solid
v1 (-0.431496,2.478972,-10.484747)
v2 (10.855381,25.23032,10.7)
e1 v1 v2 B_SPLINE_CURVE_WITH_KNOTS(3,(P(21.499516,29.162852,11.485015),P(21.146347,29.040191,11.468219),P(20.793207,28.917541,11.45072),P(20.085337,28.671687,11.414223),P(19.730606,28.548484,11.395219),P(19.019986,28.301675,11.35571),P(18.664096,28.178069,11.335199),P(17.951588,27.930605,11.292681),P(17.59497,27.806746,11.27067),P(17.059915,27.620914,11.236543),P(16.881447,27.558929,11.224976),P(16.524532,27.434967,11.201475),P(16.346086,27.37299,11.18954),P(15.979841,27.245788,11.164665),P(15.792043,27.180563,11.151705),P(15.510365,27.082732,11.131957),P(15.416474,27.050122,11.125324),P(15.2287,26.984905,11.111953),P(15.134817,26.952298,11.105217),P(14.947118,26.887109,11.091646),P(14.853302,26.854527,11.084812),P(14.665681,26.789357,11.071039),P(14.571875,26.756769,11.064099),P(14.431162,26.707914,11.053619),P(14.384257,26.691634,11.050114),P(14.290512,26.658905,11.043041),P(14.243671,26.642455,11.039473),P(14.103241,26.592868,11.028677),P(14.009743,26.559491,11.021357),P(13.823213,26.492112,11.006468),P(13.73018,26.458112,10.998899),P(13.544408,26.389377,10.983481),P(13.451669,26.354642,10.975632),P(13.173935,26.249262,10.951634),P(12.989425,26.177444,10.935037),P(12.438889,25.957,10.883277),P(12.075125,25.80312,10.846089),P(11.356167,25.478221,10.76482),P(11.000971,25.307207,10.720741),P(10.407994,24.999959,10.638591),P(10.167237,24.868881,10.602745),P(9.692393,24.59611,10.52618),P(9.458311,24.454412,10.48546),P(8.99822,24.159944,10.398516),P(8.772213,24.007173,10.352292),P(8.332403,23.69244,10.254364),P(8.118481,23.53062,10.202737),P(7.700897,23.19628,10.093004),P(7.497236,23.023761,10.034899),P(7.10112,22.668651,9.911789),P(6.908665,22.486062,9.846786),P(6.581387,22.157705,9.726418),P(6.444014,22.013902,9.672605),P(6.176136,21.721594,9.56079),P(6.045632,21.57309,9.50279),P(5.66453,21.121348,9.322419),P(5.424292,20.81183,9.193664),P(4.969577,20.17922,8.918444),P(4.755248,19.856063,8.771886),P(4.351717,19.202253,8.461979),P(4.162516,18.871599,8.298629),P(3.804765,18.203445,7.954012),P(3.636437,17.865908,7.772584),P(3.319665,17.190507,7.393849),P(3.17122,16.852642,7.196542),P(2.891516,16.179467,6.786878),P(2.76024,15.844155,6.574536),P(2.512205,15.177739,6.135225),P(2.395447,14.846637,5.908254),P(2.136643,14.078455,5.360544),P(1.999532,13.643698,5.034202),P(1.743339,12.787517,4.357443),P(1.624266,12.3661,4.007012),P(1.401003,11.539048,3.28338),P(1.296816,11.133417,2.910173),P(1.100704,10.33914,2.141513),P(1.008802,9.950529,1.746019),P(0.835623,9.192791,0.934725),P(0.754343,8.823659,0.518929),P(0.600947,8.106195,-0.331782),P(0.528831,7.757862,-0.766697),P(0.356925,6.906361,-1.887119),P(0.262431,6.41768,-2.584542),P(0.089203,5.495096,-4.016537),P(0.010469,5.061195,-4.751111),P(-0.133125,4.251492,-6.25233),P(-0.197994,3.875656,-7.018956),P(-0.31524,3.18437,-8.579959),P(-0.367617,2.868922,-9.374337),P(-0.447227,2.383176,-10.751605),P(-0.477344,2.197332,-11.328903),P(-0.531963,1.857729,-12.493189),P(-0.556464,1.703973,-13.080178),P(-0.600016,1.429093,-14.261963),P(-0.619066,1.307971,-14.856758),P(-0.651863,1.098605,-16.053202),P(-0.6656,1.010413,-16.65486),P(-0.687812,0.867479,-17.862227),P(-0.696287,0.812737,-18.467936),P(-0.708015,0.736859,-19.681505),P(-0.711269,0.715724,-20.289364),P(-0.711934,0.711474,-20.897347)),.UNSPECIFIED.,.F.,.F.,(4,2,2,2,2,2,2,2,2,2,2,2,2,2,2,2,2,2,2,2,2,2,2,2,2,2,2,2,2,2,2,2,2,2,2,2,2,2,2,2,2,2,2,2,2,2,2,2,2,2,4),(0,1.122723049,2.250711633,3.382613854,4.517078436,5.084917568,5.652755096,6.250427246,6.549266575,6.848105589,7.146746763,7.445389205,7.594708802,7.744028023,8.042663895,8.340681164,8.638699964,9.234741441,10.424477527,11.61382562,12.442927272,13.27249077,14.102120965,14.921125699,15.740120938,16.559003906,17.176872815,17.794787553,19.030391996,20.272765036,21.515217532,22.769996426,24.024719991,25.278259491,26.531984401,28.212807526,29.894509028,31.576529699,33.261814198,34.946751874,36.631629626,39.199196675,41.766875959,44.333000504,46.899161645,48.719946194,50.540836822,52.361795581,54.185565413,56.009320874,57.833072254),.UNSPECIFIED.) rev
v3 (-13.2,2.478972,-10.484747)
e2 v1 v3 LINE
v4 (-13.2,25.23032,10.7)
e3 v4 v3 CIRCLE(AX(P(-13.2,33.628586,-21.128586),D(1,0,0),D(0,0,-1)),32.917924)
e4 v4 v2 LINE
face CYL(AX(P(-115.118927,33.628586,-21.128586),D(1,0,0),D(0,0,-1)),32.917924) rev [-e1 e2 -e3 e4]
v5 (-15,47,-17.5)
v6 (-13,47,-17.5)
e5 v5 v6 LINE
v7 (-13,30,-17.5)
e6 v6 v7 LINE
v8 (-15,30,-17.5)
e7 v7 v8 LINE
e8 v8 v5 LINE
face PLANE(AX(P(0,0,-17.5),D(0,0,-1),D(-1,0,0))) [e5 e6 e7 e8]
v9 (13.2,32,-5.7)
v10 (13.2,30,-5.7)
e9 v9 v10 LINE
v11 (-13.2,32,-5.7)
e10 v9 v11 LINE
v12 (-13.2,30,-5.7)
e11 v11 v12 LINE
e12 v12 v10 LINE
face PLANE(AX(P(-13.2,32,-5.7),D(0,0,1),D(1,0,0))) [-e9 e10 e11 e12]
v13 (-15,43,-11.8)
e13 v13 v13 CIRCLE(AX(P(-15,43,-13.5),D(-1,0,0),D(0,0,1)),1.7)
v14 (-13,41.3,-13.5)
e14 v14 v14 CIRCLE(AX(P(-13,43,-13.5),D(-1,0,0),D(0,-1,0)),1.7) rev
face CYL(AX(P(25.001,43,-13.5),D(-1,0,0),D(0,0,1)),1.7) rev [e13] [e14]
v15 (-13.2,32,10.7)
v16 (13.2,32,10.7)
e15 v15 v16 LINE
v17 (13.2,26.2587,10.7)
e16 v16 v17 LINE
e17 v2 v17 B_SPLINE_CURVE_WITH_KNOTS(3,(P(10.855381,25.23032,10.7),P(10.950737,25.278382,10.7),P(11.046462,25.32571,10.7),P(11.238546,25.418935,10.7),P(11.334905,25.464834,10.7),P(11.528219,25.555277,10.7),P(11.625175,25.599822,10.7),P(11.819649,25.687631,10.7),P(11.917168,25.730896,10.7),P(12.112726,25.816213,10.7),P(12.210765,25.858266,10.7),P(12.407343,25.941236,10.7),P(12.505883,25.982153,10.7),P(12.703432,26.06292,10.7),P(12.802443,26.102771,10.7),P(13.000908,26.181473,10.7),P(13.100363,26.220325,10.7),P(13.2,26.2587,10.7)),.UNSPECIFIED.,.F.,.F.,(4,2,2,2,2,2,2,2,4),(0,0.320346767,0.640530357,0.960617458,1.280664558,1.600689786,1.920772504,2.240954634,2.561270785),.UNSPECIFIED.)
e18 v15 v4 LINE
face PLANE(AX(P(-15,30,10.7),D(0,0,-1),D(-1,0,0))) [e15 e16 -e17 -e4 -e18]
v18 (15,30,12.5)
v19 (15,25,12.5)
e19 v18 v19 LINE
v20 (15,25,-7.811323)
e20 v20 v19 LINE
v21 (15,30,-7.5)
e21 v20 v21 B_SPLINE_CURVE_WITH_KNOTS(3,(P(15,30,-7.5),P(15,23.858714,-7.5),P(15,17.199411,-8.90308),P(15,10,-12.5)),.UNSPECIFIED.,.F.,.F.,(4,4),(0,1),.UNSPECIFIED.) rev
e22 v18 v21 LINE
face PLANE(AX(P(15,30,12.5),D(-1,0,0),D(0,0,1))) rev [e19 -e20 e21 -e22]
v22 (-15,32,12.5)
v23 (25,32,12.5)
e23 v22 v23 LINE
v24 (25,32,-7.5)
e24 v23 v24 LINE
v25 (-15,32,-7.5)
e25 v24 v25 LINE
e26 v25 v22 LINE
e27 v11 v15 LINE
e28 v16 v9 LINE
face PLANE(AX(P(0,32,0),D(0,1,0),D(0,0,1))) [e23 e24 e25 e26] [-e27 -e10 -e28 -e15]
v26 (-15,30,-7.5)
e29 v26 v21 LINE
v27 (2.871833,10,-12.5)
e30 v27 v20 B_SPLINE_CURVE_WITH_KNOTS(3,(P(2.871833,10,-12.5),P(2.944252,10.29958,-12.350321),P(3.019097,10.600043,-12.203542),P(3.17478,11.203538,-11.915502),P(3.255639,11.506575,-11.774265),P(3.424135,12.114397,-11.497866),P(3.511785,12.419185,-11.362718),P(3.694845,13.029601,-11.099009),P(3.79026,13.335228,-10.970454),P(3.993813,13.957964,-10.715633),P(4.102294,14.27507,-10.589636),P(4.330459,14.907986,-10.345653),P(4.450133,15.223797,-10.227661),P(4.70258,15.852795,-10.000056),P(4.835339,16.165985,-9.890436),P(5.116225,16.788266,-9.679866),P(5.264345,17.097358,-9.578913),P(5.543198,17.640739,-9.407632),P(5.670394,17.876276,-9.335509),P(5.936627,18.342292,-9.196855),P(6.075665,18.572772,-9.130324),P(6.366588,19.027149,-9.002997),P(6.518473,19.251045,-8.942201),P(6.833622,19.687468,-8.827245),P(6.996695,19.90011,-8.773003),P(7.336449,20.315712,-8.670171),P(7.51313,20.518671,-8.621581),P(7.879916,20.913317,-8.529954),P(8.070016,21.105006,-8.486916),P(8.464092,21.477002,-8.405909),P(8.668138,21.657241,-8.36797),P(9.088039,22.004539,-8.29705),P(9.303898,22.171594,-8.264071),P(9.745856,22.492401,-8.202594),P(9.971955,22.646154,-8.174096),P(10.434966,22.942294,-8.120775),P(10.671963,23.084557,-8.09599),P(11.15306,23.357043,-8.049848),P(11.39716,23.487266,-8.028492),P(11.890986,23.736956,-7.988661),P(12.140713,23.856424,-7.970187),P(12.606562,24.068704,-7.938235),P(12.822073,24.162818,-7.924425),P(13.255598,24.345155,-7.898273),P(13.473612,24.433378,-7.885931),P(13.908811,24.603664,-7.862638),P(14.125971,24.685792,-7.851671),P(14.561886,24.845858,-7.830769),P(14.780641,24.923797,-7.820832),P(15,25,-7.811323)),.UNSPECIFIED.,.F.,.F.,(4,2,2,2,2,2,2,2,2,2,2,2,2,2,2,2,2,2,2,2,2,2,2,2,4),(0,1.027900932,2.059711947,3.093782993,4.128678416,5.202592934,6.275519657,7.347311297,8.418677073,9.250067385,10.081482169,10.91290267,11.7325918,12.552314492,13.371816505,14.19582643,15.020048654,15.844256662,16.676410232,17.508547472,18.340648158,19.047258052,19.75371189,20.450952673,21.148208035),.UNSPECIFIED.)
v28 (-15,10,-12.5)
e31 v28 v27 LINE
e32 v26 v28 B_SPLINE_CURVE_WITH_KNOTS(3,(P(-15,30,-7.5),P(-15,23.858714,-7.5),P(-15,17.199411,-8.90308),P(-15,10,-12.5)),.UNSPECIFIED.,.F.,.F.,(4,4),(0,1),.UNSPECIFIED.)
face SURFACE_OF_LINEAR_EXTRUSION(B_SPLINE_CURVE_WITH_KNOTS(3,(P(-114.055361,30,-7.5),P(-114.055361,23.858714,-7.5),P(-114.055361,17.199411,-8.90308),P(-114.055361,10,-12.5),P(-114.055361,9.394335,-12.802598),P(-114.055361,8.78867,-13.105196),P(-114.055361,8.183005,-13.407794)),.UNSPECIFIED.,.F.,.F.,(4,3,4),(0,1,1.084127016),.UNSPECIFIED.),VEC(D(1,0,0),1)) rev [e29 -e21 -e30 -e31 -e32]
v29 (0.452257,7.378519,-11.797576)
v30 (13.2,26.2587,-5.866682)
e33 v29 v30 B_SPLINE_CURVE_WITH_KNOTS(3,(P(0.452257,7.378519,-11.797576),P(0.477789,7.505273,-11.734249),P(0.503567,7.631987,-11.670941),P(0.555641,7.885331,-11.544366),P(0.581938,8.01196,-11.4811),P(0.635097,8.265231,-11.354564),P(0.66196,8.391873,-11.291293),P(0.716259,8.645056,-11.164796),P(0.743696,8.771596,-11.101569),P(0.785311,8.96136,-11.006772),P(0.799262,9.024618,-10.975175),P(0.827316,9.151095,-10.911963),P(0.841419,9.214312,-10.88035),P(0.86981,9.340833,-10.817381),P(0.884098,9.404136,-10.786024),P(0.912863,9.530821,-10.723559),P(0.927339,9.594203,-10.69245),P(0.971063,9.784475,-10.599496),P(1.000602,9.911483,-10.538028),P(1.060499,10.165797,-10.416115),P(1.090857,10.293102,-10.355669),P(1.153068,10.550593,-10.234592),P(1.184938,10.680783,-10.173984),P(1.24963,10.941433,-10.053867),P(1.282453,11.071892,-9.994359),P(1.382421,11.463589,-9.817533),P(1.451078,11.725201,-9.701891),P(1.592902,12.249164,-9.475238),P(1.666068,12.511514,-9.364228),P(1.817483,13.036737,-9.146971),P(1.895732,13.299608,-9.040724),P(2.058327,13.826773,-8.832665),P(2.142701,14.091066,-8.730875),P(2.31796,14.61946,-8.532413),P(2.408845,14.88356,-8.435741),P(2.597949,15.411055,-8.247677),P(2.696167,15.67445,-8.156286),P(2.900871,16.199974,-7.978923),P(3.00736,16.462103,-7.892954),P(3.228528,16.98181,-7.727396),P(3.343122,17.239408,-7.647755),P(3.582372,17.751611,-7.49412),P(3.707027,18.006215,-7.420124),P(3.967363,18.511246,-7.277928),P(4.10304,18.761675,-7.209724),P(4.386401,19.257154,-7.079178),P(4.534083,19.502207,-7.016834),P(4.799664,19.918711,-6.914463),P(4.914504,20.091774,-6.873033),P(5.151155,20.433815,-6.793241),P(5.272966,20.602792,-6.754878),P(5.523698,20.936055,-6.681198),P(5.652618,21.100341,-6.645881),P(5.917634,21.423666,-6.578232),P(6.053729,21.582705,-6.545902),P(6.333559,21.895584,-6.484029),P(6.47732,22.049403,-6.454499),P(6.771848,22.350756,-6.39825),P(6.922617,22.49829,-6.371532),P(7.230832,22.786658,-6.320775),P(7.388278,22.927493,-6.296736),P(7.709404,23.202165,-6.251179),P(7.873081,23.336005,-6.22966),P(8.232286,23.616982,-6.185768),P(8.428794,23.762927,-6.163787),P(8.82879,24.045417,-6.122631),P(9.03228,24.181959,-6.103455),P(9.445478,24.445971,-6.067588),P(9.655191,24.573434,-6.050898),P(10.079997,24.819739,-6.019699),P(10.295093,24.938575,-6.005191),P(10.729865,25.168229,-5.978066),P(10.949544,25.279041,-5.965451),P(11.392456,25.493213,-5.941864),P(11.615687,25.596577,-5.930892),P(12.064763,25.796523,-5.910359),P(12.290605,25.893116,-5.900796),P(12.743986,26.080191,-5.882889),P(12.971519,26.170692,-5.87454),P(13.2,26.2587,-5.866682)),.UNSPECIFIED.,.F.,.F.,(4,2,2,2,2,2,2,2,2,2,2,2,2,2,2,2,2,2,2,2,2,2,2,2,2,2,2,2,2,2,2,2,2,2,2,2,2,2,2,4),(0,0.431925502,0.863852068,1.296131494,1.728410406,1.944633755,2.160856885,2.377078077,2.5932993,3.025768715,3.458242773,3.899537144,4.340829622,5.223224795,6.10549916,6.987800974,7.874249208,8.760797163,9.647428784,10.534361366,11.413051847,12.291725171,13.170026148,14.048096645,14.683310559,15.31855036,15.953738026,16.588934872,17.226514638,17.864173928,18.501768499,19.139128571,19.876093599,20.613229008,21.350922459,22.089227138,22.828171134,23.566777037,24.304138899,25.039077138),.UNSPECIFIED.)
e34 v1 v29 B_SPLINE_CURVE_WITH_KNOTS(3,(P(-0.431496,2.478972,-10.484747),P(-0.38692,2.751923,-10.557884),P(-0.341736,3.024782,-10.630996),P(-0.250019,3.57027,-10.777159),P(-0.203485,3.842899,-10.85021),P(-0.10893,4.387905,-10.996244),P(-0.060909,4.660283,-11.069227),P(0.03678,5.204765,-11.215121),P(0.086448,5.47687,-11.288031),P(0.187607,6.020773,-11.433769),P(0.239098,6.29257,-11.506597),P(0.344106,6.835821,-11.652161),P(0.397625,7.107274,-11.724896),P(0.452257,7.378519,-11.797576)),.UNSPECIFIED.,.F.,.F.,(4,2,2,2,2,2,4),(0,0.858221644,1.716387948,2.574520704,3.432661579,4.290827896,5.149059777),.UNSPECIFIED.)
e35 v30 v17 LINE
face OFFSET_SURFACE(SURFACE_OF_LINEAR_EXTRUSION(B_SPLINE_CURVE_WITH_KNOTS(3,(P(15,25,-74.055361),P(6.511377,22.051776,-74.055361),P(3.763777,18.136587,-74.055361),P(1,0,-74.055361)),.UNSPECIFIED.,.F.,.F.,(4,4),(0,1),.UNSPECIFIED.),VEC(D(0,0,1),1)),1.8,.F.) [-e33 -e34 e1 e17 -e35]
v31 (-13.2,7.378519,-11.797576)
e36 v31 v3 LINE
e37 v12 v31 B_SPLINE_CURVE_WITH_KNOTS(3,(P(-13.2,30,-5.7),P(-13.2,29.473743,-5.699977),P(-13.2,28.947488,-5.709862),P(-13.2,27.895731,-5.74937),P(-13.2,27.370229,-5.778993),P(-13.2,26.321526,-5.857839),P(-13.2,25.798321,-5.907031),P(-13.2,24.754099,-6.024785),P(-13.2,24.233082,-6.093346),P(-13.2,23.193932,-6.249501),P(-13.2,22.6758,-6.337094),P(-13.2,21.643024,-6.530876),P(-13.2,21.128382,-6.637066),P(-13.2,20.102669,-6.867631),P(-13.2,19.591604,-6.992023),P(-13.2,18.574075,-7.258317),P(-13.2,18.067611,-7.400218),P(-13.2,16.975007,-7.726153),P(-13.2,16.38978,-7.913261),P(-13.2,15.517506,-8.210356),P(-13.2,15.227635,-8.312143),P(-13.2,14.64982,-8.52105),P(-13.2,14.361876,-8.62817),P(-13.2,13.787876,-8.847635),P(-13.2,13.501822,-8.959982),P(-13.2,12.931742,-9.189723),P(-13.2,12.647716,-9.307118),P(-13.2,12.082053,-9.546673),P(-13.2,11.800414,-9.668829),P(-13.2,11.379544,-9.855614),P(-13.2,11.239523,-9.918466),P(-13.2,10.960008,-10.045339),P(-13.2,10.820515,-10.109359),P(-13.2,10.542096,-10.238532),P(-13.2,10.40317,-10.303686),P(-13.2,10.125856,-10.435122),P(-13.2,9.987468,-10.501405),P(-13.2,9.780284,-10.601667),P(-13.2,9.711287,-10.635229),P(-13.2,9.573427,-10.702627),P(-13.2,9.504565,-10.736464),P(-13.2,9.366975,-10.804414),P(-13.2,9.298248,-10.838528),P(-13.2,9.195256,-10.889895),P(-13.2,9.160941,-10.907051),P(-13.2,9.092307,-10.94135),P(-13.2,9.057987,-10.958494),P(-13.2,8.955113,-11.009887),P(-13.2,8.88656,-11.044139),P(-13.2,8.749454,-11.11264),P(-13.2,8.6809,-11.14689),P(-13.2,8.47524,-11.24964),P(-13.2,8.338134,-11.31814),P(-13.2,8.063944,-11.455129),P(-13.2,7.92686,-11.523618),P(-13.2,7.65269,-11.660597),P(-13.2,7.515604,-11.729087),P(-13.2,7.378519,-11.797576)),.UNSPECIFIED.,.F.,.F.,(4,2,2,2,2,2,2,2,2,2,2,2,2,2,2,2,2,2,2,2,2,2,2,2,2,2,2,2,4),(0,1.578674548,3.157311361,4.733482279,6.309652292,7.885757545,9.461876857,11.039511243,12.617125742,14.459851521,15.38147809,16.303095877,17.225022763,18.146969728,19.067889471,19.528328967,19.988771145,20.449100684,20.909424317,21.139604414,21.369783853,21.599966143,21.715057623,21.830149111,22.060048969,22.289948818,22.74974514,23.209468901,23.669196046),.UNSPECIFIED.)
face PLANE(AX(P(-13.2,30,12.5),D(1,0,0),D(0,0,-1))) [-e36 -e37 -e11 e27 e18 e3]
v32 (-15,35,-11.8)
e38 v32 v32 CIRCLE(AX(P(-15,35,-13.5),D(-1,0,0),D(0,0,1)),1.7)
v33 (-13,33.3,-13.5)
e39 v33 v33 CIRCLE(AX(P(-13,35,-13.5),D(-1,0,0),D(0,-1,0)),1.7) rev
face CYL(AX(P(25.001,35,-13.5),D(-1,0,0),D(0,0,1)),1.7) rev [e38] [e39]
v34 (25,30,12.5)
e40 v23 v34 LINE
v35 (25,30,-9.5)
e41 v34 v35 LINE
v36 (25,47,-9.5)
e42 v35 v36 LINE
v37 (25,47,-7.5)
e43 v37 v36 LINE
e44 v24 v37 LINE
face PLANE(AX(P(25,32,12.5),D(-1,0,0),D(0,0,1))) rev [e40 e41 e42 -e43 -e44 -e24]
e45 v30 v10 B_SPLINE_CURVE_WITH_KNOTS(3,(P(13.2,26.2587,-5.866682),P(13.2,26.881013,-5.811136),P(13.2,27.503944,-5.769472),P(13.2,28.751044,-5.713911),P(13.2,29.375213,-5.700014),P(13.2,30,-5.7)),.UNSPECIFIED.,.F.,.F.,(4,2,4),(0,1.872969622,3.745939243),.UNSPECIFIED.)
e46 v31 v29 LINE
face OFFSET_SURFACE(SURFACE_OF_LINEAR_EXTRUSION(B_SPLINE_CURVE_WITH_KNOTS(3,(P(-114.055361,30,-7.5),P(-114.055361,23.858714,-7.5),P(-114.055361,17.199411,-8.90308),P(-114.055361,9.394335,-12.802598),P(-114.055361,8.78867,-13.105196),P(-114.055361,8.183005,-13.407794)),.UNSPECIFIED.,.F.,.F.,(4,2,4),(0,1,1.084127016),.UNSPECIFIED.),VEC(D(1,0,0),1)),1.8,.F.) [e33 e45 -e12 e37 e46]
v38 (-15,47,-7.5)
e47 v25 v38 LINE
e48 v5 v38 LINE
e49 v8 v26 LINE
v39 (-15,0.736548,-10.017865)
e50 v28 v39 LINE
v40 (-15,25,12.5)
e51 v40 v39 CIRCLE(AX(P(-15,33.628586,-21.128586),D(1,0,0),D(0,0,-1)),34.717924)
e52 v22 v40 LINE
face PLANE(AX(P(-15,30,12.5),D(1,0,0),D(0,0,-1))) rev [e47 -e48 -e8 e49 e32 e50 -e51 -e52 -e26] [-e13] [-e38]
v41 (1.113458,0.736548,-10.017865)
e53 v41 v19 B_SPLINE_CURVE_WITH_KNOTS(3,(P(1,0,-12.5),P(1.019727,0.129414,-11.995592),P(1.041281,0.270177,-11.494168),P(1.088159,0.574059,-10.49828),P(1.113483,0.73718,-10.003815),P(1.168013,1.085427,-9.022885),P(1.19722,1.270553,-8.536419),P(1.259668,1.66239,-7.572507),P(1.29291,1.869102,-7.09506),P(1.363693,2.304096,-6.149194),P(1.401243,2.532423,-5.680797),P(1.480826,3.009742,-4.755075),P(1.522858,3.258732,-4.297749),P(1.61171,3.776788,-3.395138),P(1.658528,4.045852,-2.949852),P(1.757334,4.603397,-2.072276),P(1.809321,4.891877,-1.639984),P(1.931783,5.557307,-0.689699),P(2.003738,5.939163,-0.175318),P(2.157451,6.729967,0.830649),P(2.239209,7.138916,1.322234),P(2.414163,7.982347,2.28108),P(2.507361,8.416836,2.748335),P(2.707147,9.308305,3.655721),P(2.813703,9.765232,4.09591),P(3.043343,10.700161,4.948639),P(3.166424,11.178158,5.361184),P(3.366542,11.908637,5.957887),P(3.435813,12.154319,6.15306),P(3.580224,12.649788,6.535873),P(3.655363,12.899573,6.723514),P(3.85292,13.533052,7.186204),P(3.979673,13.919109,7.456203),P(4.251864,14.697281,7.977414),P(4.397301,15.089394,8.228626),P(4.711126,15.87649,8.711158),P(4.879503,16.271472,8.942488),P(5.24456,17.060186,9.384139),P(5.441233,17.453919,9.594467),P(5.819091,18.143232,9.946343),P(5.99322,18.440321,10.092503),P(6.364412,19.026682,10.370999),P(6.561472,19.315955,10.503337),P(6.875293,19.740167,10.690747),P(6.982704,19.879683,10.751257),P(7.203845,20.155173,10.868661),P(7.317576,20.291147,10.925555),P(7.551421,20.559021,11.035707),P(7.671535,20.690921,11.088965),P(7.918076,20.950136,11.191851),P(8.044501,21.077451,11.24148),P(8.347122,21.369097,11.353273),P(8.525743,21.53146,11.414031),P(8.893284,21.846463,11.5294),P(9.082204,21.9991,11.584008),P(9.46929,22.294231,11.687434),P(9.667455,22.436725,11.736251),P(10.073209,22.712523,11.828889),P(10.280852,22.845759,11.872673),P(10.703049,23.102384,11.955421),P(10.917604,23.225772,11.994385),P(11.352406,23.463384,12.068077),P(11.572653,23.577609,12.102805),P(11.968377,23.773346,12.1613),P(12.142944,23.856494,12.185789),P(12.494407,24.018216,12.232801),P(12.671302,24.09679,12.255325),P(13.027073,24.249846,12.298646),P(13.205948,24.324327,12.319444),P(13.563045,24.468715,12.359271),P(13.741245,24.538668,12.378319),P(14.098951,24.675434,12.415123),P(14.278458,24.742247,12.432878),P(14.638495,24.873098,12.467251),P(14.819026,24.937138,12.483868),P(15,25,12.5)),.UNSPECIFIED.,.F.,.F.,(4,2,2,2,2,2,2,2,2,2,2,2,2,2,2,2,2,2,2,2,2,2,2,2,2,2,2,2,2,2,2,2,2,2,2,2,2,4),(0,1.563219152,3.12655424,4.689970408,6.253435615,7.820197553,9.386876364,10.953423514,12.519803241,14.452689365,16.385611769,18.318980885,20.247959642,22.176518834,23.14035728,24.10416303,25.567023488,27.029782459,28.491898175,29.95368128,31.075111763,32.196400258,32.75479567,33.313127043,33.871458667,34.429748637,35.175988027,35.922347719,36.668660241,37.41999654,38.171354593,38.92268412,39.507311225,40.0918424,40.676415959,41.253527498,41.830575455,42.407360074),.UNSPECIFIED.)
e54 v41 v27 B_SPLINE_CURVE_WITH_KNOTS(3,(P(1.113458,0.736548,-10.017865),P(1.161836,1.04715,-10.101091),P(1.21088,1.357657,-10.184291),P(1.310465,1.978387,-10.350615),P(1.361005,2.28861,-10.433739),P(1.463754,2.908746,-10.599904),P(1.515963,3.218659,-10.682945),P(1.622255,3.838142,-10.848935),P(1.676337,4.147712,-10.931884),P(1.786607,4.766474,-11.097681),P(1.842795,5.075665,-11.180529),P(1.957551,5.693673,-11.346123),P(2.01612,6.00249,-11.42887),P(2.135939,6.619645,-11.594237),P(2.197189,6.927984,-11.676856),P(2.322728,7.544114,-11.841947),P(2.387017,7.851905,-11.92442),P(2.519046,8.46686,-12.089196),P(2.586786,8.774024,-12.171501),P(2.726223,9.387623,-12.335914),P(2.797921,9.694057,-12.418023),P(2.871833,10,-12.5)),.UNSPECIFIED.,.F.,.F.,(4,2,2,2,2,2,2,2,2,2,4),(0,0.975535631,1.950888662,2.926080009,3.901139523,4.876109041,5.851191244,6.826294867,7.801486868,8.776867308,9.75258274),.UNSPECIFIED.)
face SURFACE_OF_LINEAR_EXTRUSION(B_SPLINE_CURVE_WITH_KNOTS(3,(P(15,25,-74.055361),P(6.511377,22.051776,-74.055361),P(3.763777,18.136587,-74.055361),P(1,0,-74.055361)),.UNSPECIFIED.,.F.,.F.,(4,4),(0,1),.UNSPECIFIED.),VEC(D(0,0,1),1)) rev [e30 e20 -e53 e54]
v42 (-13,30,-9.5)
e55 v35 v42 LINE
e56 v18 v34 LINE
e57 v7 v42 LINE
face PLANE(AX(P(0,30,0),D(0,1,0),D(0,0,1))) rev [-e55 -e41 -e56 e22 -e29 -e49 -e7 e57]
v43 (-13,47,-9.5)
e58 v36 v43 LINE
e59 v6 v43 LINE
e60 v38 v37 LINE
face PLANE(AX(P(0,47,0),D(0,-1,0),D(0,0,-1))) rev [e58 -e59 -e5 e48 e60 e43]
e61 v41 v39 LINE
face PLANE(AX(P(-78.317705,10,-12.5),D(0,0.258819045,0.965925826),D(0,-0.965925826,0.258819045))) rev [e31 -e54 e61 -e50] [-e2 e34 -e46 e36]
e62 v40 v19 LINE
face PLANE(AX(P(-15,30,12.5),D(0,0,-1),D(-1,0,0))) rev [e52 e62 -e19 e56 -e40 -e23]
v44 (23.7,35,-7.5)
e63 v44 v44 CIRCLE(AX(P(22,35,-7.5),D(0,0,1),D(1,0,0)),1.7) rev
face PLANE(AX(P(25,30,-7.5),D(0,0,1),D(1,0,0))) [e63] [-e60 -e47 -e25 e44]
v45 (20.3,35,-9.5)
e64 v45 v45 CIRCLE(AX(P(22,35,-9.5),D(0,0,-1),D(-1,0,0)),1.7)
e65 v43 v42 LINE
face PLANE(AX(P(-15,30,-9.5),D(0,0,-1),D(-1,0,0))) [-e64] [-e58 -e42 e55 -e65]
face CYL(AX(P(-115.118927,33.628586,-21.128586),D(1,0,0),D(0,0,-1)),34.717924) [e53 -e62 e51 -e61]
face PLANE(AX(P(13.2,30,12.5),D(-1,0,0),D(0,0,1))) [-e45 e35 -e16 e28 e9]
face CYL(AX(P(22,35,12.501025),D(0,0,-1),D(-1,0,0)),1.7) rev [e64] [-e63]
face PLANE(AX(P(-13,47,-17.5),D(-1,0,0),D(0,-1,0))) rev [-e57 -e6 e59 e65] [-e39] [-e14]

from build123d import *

# Parameters (mm, degrees)
SKETCH_1_W               = 30
SKETCH_1_H               = 25
EXTRUDE_1_DEPTH          = 30
CUT_EXTRUDE_START        = -25
CUT_EXTRUDE_1_DEPTH      = 25
CUT_EXTRUDE_START_2      = -30
CUT_EXTRUDE_2_DEPTH      = 30
CUT_EXTRUDE_3_DEPTH      = 45.229515196
CUT_EXTRUDE_3_DEPTH_BACK = 45.229515196
CUT_EXTRUDE_4_DEPTH      = 45.229515196
CUT_EXTRUDE_4_DEPTH_BACK = 45.229515196
SHELL_2_T                = -1.8
SKETCH_8_W               = 40
SKETCH_8_H               = 20
SKETCH_8_W_2             = 26.4
SKETCH_8_H_2             = 16.4
EXTRUDE_2_DEPTH          = 2
EXTRUDE_3_DEPTH          = 15
EXTRUDE_3_DEPTH_BACK     = 2
SKETCH_9_W               = 40
SKETCH_9_H               = 2
SKETCH_10_W              = 2
SKETCH_10_H              = 17
EXTRUDE_4_DEPTH          = 8
CUT_EXTRUDE_5_REACH      = 66.15
SKETCH_13_R              = 1.7
CUT_EXTRUDE_6_REACH      = 59.602
SKETCH_14_R              = 1.7


# Read off the part's stored shape, not the designer's step: 切除-拉伸1, 切除-拉伸2
with BuildPart() as part:
    # 草图1 → 凸台-拉伸1 (new body)
    with BuildSketch(Plane(origin=(0, 0, 0), x_dir=(1, 0, 0), z_dir=(0, 1, 0))):
        Rectangle(SKETCH_1_W, SKETCH_1_H)
    extrude(amount=EXTRUDE_1_DEPTH)

    # 切除-拉伸1 outline → 切除-拉伸1 (cut)
    with BuildSketch(Plane(origin=(0, 0, -12.5), x_dir=(-1, 0, 0), z_dir=(0, 0, -1)).offset(CUT_EXTRUDE_START)):
        with BuildLine():
            add(Edge.make_bspline(
                [(-15, 25), (-6.511377405, 22.051776189), (-3.763777339, 18.136586702), (-1, 0)],
                knots=[0, 0, 0, 0, 1, 1, 1, 1], degree=3))
            Line((-15, 25), (-15, 0))
            Line((-15, 0), (-1, 0))
        make_face()
    extrude(amount=CUT_EXTRUDE_1_DEPTH, mode=Mode.SUBTRACT)

    # 切除-拉伸2 outline → 切除-拉伸2 (cut)
    with BuildSketch(Plane.ZY.offset(15).offset(CUT_EXTRUDE_START_2)):
        with BuildLine():
            add(Edge.make_bspline(
                [(-7.5, 30), (-7.5, 23.858714032), (-8.903080152, 17.199411136), (-12.5, 10)],
                knots=[0, 0, 0, 0, 1, 1, 1, 1], degree=3))
            Line((-7.5, 30), (-12.5, 30))
            Line((-12.5, 30), (-12.5, 10))
        make_face()
    extrude(amount=CUT_EXTRUDE_2_DEPTH, mode=Mode.SUBTRACT)

    # 草图6 → 切除-拉伸3 (cut, two sides: drawn at the far end of the back side and taken through both)
    with BuildSketch(Plane.ZY.offset(15).offset(-CUT_EXTRUDE_3_DEPTH_BACK)):
        with BuildLine():
            Line((34.396469071, 110.338119425), (12.5, 25))
            ThreePointArc((12.5, 25), (3.420693976, 9.079306024), (-12.5, 0))
            Line((-12.5, 0), (-97.838119425, -21.896469071))
            Line((-97.838119425, -21.896469071), (26.757626769, -146.492215265))
            Line((26.757626769, -146.492215265), (158.992215265, -14.257626769))
            Line((158.992215265, -14.257626769), (34.396469071, 110.338119425))
        make_face()
    extrude(amount=CUT_EXTRUDE_3_DEPTH + CUT_EXTRUDE_3_DEPTH_BACK, mode=Mode.SUBTRACT)

    # 草图7 → 切除-拉伸4 (cut, two sides: drawn at the far end of the back side and taken through both)
    with BuildSketch(Plane.ZY.offset(15).offset(-CUT_EXTRUDE_4_DEPTH_BACK)):
        Polygon((-34.201614467, 90.991527796), (-12.5, 10), (-10.017865444, 0.736547724), (11.683749023, -80.254980072), (-150.299306569, -123.658209006), (-196.184670059, 47.588298863), align=None)
    extrude(amount=CUT_EXTRUDE_4_DEPTH + CUT_EXTRUDE_4_DEPTH_BACK, mode=Mode.SUBTRACT)

    # 抽壳2
    shell_2_openings = [part.faces().sort_by_distance(p)[0] for p in [
        (0, 30, 2.5),
        (-6.528277813, 5.44772403, -11.28022133),
    ]]
    offset(amount=SHELL_2_T, openings=shell_2_openings)

    # 草图8 → 凸台-拉伸2 (add)
    with BuildSketch(Plane(origin=(0, 30, 0), x_dir=(1, 0, 0), z_dir=(0, 1, 0))):
        with Locations((5, -2.5)):
            Rectangle(SKETCH_8_W, SKETCH_8_H)
        with Locations((0, -2.5)):
            Rectangle(SKETCH_8_W_2, SKETCH_8_H_2, mode=Mode.SUBTRACT)
    extrude(amount=EXTRUDE_2_DEPTH)

    # 草图9 → 凸台-拉伸3 (add, two sides: drawn at the far end of the back side and taken through both)
    with BuildSketch(Plane(origin=(0, 32, 0), x_dir=(1, 0, 0), z_dir=(0, 1, 0)).offset(-EXTRUDE_3_DEPTH_BACK)):
        with Locations((5, 8.5)):
            Rectangle(SKETCH_9_W, SKETCH_9_H)
    extrude(amount=EXTRUDE_3_DEPTH + EXTRUDE_3_DEPTH_BACK)

    # 草图10 → 凸台-拉伸4 (add)
    with BuildSketch(Plane(origin=(0, 0, -9.5), x_dir=(-1, 0, 0), z_dir=(0, 0, -1))):
        with Locations((14, 38.5)):
            Rectangle(SKETCH_10_W, SKETCH_10_H)
    extrude(amount=EXTRUDE_4_DEPTH)

    # 草图13 → 切除-拉伸5 (cut, up to next)
    with BuildSketch(Plane.ZY.offset(15), mode=Mode.PRIVATE) as cut_extrude_5_sk1:
        with Locations((-13.5, 43)):
            Circle(SKETCH_13_R)
    cut_extrude_5_tool1 = extrude(cut_extrude_5_sk1.sketch, amount=-CUT_EXTRUDE_5_REACH, mode=Mode.PRIVATE) & part.part
    # 草图13 → 切除-拉伸5 (cut, up to next)
    with BuildSketch(Plane.ZY.offset(15), mode=Mode.PRIVATE) as cut_extrude_5_sk2:
        with Locations((-13.5, 35)):
            Circle(SKETCH_13_R)
    cut_extrude_5_tool2 = extrude(cut_extrude_5_sk2.sketch, amount=-CUT_EXTRUDE_5_REACH, mode=Mode.PRIVATE) & part.part
    add(cut_extrude_5_tool1.solids().sort_by_distance((-15, 43, -13.5))[0], mode=Mode.SUBTRACT)
    add(cut_extrude_5_tool2.solids().sort_by_distance((-15, 35, -13.5))[0], mode=Mode.SUBTRACT)

    # 草图14 → 切除-拉伸6 (cut, up to next)
    with BuildSketch(Plane(origin=(0, 0, -9.5), x_dir=(-1, 0, 0), z_dir=(0, 0, -1)), mode=Mode.PRIVATE) as cut_extrude_6_sk1:
        with Locations((-22, 35)):
            Circle(SKETCH_14_R)
    cut_extrude_6_tool1 = extrude(cut_extrude_6_sk1.sketch, amount=-CUT_EXTRUDE_6_REACH, mode=Mode.PRIVATE) & part.part
    add(cut_extrude_6_tool1.solids().sort_by_distance((22, 35, -9.5))[0], mode=Mode.SUBTRACT)


solid = part.part
